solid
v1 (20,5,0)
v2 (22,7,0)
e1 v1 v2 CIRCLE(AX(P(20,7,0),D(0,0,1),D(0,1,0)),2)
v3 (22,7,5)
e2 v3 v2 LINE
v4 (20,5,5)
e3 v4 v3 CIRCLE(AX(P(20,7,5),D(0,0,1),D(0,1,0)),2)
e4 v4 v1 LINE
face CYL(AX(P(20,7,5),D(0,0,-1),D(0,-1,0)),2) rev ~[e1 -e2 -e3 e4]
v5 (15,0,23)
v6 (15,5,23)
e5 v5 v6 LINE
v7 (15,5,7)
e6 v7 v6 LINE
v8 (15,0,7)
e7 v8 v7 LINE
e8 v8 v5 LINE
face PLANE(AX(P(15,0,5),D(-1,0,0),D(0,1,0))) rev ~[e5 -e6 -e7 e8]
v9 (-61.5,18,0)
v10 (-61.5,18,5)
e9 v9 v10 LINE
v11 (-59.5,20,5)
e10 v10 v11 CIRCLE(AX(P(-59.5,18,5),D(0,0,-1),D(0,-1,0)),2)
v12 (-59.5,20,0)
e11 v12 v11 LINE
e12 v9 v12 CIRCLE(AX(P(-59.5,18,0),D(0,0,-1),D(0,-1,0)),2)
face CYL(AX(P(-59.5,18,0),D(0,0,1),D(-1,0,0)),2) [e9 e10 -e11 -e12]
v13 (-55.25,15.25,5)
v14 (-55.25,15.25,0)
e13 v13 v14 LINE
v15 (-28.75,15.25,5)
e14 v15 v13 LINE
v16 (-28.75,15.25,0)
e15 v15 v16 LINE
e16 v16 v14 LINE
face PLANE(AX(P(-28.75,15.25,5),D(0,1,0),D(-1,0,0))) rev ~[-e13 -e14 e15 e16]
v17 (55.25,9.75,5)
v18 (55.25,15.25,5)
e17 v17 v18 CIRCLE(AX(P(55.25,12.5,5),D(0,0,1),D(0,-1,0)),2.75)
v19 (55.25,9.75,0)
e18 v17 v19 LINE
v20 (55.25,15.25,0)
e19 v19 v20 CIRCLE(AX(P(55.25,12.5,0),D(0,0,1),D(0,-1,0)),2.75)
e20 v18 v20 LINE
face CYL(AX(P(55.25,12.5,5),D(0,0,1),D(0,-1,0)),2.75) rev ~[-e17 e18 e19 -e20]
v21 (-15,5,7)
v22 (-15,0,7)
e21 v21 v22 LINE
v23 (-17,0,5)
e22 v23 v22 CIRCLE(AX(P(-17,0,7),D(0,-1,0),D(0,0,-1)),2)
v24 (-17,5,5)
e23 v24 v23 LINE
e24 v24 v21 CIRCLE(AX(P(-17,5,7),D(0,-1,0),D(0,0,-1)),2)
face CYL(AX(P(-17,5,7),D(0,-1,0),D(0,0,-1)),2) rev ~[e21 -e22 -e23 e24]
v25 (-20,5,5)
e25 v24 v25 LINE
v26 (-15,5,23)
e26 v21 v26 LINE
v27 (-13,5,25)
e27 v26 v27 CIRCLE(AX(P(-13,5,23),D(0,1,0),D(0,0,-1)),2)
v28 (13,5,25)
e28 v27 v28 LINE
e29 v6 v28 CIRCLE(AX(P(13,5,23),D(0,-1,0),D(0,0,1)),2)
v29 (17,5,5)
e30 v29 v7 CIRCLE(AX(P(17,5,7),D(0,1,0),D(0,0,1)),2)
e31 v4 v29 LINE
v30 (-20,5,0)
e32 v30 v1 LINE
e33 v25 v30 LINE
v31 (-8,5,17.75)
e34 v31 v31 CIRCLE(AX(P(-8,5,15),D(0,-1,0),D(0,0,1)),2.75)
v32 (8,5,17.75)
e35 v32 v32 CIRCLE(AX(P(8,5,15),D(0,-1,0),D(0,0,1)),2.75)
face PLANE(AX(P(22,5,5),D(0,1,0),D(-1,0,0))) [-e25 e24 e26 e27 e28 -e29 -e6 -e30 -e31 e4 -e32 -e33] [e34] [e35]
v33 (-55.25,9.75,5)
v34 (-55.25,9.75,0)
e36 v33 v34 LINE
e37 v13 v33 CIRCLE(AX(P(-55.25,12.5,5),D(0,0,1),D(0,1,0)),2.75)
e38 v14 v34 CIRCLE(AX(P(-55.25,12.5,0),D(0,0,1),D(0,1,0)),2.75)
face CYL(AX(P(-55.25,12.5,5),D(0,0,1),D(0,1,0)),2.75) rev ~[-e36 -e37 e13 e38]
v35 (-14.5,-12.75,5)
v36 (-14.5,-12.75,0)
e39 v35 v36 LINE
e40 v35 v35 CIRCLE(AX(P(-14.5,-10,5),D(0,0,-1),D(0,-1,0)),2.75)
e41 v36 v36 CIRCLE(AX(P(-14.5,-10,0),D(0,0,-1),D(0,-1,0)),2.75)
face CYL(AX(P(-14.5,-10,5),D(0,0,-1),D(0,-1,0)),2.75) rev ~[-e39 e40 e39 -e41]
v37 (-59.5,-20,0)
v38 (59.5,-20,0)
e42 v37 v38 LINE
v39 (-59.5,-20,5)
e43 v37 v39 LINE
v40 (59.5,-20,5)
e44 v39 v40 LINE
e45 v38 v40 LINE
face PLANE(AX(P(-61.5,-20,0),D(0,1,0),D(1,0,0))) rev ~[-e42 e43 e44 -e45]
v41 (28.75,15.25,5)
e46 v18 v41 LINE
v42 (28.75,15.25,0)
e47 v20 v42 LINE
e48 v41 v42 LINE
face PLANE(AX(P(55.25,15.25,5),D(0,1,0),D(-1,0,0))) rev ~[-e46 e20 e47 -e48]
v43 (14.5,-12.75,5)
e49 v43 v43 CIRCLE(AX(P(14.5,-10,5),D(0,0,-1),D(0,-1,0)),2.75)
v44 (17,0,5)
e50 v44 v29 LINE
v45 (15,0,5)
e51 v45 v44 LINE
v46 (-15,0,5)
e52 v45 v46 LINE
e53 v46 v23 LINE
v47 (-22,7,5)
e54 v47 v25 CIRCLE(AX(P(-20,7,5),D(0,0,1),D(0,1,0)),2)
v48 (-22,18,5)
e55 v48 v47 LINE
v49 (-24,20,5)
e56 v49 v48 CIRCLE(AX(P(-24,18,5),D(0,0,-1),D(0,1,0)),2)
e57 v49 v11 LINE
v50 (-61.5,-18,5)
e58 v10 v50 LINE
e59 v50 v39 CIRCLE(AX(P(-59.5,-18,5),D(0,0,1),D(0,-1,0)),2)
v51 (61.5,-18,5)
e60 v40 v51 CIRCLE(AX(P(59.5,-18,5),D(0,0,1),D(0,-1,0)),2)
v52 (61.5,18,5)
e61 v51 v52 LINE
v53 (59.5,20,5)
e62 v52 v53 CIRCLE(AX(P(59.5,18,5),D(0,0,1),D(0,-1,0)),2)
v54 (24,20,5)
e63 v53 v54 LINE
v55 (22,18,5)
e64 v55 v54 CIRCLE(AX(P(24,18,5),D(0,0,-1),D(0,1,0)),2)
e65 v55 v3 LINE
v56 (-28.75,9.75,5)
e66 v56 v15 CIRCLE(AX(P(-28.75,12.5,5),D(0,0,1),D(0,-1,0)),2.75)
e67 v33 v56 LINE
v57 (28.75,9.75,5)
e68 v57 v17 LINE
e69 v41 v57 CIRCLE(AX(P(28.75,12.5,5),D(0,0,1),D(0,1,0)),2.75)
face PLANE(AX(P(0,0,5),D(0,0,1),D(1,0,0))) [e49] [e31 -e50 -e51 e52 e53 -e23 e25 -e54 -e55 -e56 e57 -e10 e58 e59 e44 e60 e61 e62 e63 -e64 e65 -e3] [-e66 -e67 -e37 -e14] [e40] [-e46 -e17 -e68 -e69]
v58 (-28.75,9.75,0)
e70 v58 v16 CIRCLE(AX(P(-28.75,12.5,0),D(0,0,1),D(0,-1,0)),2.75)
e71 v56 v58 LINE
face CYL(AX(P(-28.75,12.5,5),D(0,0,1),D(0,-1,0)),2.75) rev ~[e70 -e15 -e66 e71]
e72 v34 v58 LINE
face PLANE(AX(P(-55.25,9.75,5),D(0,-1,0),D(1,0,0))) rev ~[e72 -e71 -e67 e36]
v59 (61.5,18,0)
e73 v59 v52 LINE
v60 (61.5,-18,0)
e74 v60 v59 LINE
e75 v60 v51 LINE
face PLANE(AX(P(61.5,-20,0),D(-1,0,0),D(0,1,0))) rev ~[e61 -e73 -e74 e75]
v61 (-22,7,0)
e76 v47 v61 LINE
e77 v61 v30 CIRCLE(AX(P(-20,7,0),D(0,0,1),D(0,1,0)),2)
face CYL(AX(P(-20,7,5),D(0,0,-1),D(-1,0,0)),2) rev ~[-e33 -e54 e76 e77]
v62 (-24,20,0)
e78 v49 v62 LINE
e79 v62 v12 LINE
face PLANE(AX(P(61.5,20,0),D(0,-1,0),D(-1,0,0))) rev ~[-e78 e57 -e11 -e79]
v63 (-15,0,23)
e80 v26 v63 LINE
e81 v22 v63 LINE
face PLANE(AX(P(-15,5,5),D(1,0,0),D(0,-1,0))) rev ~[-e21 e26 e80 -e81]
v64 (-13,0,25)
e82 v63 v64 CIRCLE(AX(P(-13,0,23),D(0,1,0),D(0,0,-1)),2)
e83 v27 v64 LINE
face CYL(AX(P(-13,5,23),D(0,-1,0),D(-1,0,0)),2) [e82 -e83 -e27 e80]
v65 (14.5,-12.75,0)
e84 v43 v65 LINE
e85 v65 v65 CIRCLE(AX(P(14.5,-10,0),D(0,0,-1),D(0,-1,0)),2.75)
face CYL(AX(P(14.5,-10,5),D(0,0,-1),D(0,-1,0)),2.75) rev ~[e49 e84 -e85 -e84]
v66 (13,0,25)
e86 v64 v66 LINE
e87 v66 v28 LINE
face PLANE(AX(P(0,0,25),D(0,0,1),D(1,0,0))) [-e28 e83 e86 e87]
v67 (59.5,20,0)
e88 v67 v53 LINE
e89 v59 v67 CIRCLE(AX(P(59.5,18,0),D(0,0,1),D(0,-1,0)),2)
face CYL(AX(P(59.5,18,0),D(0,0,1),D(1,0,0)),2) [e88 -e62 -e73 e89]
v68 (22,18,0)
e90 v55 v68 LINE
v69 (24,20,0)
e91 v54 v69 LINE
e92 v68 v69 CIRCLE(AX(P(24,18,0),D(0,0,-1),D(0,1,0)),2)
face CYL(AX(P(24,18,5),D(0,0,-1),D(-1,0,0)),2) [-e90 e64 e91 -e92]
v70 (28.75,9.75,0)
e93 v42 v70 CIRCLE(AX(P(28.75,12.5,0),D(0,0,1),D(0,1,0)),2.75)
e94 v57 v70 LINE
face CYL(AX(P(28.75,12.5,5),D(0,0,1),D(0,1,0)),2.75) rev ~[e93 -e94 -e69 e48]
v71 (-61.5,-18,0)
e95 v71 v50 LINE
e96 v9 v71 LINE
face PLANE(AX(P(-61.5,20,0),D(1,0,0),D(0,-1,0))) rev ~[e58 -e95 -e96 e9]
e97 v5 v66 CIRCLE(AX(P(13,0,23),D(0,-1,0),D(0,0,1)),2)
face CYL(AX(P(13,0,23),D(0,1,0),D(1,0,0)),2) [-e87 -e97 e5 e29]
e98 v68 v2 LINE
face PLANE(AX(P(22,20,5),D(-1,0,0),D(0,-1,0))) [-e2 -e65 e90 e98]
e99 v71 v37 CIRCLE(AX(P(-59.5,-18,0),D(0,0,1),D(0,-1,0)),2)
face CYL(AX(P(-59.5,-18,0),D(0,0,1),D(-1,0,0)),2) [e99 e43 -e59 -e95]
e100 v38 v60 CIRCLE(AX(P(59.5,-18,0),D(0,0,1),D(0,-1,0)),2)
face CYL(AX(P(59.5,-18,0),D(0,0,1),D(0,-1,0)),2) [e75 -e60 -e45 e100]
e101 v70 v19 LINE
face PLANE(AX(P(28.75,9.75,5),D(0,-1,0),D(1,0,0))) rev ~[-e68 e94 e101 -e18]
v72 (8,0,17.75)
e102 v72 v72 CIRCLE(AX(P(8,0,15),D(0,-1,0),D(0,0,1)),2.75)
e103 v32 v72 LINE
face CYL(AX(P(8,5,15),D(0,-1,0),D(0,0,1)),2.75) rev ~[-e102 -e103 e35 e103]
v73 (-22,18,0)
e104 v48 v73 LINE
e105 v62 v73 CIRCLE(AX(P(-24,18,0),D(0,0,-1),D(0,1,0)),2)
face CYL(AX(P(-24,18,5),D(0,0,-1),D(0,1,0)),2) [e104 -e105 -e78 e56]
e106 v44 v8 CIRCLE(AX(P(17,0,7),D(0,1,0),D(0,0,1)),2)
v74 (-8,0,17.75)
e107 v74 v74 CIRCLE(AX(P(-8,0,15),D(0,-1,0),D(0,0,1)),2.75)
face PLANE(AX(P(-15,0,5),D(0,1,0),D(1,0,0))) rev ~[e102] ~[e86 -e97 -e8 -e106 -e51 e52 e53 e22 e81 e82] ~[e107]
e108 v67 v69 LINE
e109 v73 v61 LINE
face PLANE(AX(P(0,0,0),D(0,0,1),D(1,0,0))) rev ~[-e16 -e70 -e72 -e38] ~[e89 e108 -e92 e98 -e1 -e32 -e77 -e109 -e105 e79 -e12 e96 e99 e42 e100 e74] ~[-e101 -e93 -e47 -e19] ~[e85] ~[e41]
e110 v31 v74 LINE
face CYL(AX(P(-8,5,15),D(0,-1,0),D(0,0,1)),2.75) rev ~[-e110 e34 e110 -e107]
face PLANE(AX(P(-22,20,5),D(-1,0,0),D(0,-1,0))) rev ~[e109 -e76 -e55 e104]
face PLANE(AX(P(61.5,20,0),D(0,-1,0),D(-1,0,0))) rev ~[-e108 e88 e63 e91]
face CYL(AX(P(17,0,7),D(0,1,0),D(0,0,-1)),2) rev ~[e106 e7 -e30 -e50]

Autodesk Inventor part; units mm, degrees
ref_plane "YZ Plane" through (0, 0, 0) normal (1, 0, 0) x (0, 1, 0)
ref_plane "XZ Plane" through (0, 0, 0) normal (0, 1, 0) x (-1, 0, 0)
ref_plane "XY Plane" through (0, 0, 0) normal (0, 0, 1) x (1, 0, 0)
sketch "スケッチ1" plane through (0, 0, 0) normal (0, 0, 1) x (1, 0, 0)
  line L0 (-61.5, -20) -> (61.5, -20)
  line L1 (61.5, -20) -> (61.5, 20)
  line L2 (61.5, 20) -> (-61.5, 20)
  line L3 (-61.5, 20) -> (-61.5, -20)
  line L4 (-61.5, -20) -> (61.5, 20) construction
  line L5 (61.5, -20) -> (-61.5, 20) construction
  point P0 (0, 0)
  dimension "d0" = 123
  dimension "d1" = 40
extrude "押し出し1" add sketch "スケッチ1" along normal blind 5
sketch "スケッチ2" plane through (0, 0, 5) normal (0, 0, 1) x (1, 0, 0)
  line L0 (61.5, 20) -> (-61.5, 20) projected
  line L1 (0, 20) -> (22, 20)
  line L2 (22, 20) -> (22, 5)
  line L3 (22, 5) -> (0, 5)
  line L4 (0, 5) -> (0, 20)
  line L5 (0, 20) -> (-22, 20)
  line L6 (-22, 20) -> (-22, 5)
  line L7 (-22, 5) -> (0, 5)
  line L8 (0, 5) -> (0, 20)
  point P0 (0, 0)
  dimension "d4" = 22
  dimension "d5" = 15
  dimension "d6" = 22
extrude "押し出し2" cut sketch "スケッチ2" against normal blind 5
sketch "スケッチ3" plane through (0, 0, 5) normal (0, 0, 1) x (1, 0, 0)
  line L0 (61.5, 20) -> (22, 20) projected
  line L1 (-22, 5) -> (-22, 20) projected
  line L2 (22, 20) -> (22, 5) projected
  line L3 (-28.75, 12.5) -> (-55.25, 12.5) construction
  line L4 (-28.75, 15.25) -> (-55.25, 15.25)
  line L5 (-55.25, 9.75) -> (-28.75, 9.75)
  arc A0 (-28.75, 9.75) -> (-28.75, 15.25) centre (-28.75, 12.5) ccw
  arc A1 (-55.25, 15.25) -> (-55.25, 9.75) centre (-55.25, 12.5) ccw
  line L6 (55.25, 12.5) -> (28.75, 12.5) construction
  line L7 (55.25, 15.25) -> (28.75, 15.25)
  line L8 (28.75, 9.75) -> (55.25, 9.75)
  arc A2 (55.25, 9.75) -> (55.25, 15.25) centre (55.25, 12.5) ccw
  arc A3 (28.75, 15.25) -> (28.75, 9.75) centre (28.75, 12.5) ccw
  point P0 (0, 0)
  point P1 (42, 12.5)
  point P2 (-42, 12.5)
  dimension "d9" = 7.5
  dimension "d10" = 20
  dimension "d11" = 20
  dimension "d12" = 32
  dimension "d13" = 5.5
  dimension "d14" = 32
  dimension "d15" = 5.5
extrude "押し出し3" cut sketch "スケッチ3" against normal blind 5
sketch "スケッチ4" plane through (0, 0, 5) normal (0, 0, 1) x (1, 0, 0)
  line L0 (-61.5, -20) -> (61.5, -20) projected
  line L1 (61.5, -20) -> (61.5, 20) projected
  line L2 (-61.5, 20) -> (-61.5, -20) projected
  point P0 (0, 0)
  point P1 (14.5, -10)
  point P2 (-14.5, -10)
  dimension "d18" = 10
  dimension "d19" = 47
  dimension "d20" = 47
  dimension "d21" = 10
hole "穴1" at (14.5, -10, 5) at (-14.5, -10, 5) direction (0, 0, -1) diameter 5.5 depth 8.8 tip angle 118
sketch "スケッチ5" plane through (0, 0, 5) normal (0, 0, 1) x (1, 0, 0)
  line L0 (-22, 5) -> (22, 5) projected
  line L1 (0, 5) -> (-15, 5)
  line L2 (-15, 5) -> (-15, 0)
  line L3 (-15, 0) -> (0, 0)
  line L4 (0, 0) -> (0, 5)
  line L5 (0, 0) -> (15, 0)
  line L6 (15, 0) -> (15, 5)
  line L7 (15, 5) -> (0, 5)
  line L8 (0, 5) -> (0, 0)
  point P0 (0, 0)
  dimension "d29" = 15
  dimension "d30" = 15
extrude "押し出し4" add sketch "スケッチ5" along normal blind 20
sketch "スケッチ6" plane through (-15, 0, 5) normal (0, -1, 0) x (1, 0, 0)
  point P0 (15, -5)
sketch "スケッチ7" plane through (-22, 5, 0) normal (0, 1, 0) x (1, 0, 0)
  line L0 (37, -25) -> (7, -25) projected
  line L1 (37, -5) -> (37, -25) projected
  line L2 (7, -5) -> (7, -25) projected
  point P0 (22, 0)
  point P1 (30, -15)
  point P2 (14, -15)
  dimension "d33" = 10
  dimension "d34" = 10
  dimension "d35" = 7
  dimension "d36" = 7
hole "穴2" at (8, 5, 15) at (-8, 5, 15) direction (0, -1, 0) diameter 5.5 depth 8.8 tip angle 118
fillet "フィレット1" radius 2 12 edges at (-15, 2.5, 25) (15, 2.5, 25) (-22, 20, 2.5) (-61.5, 20, 2.5) (22, 20, 2.5) (61.5, 20, 2.5) (-22, 5, 2.5) (22, 5, 2.5) (15, 2.5, 5) (-15, 2.5, 5) (61.5, -20, 2.5) (-61.5, -20, 2.5)
properties part number "20230309gamma"
